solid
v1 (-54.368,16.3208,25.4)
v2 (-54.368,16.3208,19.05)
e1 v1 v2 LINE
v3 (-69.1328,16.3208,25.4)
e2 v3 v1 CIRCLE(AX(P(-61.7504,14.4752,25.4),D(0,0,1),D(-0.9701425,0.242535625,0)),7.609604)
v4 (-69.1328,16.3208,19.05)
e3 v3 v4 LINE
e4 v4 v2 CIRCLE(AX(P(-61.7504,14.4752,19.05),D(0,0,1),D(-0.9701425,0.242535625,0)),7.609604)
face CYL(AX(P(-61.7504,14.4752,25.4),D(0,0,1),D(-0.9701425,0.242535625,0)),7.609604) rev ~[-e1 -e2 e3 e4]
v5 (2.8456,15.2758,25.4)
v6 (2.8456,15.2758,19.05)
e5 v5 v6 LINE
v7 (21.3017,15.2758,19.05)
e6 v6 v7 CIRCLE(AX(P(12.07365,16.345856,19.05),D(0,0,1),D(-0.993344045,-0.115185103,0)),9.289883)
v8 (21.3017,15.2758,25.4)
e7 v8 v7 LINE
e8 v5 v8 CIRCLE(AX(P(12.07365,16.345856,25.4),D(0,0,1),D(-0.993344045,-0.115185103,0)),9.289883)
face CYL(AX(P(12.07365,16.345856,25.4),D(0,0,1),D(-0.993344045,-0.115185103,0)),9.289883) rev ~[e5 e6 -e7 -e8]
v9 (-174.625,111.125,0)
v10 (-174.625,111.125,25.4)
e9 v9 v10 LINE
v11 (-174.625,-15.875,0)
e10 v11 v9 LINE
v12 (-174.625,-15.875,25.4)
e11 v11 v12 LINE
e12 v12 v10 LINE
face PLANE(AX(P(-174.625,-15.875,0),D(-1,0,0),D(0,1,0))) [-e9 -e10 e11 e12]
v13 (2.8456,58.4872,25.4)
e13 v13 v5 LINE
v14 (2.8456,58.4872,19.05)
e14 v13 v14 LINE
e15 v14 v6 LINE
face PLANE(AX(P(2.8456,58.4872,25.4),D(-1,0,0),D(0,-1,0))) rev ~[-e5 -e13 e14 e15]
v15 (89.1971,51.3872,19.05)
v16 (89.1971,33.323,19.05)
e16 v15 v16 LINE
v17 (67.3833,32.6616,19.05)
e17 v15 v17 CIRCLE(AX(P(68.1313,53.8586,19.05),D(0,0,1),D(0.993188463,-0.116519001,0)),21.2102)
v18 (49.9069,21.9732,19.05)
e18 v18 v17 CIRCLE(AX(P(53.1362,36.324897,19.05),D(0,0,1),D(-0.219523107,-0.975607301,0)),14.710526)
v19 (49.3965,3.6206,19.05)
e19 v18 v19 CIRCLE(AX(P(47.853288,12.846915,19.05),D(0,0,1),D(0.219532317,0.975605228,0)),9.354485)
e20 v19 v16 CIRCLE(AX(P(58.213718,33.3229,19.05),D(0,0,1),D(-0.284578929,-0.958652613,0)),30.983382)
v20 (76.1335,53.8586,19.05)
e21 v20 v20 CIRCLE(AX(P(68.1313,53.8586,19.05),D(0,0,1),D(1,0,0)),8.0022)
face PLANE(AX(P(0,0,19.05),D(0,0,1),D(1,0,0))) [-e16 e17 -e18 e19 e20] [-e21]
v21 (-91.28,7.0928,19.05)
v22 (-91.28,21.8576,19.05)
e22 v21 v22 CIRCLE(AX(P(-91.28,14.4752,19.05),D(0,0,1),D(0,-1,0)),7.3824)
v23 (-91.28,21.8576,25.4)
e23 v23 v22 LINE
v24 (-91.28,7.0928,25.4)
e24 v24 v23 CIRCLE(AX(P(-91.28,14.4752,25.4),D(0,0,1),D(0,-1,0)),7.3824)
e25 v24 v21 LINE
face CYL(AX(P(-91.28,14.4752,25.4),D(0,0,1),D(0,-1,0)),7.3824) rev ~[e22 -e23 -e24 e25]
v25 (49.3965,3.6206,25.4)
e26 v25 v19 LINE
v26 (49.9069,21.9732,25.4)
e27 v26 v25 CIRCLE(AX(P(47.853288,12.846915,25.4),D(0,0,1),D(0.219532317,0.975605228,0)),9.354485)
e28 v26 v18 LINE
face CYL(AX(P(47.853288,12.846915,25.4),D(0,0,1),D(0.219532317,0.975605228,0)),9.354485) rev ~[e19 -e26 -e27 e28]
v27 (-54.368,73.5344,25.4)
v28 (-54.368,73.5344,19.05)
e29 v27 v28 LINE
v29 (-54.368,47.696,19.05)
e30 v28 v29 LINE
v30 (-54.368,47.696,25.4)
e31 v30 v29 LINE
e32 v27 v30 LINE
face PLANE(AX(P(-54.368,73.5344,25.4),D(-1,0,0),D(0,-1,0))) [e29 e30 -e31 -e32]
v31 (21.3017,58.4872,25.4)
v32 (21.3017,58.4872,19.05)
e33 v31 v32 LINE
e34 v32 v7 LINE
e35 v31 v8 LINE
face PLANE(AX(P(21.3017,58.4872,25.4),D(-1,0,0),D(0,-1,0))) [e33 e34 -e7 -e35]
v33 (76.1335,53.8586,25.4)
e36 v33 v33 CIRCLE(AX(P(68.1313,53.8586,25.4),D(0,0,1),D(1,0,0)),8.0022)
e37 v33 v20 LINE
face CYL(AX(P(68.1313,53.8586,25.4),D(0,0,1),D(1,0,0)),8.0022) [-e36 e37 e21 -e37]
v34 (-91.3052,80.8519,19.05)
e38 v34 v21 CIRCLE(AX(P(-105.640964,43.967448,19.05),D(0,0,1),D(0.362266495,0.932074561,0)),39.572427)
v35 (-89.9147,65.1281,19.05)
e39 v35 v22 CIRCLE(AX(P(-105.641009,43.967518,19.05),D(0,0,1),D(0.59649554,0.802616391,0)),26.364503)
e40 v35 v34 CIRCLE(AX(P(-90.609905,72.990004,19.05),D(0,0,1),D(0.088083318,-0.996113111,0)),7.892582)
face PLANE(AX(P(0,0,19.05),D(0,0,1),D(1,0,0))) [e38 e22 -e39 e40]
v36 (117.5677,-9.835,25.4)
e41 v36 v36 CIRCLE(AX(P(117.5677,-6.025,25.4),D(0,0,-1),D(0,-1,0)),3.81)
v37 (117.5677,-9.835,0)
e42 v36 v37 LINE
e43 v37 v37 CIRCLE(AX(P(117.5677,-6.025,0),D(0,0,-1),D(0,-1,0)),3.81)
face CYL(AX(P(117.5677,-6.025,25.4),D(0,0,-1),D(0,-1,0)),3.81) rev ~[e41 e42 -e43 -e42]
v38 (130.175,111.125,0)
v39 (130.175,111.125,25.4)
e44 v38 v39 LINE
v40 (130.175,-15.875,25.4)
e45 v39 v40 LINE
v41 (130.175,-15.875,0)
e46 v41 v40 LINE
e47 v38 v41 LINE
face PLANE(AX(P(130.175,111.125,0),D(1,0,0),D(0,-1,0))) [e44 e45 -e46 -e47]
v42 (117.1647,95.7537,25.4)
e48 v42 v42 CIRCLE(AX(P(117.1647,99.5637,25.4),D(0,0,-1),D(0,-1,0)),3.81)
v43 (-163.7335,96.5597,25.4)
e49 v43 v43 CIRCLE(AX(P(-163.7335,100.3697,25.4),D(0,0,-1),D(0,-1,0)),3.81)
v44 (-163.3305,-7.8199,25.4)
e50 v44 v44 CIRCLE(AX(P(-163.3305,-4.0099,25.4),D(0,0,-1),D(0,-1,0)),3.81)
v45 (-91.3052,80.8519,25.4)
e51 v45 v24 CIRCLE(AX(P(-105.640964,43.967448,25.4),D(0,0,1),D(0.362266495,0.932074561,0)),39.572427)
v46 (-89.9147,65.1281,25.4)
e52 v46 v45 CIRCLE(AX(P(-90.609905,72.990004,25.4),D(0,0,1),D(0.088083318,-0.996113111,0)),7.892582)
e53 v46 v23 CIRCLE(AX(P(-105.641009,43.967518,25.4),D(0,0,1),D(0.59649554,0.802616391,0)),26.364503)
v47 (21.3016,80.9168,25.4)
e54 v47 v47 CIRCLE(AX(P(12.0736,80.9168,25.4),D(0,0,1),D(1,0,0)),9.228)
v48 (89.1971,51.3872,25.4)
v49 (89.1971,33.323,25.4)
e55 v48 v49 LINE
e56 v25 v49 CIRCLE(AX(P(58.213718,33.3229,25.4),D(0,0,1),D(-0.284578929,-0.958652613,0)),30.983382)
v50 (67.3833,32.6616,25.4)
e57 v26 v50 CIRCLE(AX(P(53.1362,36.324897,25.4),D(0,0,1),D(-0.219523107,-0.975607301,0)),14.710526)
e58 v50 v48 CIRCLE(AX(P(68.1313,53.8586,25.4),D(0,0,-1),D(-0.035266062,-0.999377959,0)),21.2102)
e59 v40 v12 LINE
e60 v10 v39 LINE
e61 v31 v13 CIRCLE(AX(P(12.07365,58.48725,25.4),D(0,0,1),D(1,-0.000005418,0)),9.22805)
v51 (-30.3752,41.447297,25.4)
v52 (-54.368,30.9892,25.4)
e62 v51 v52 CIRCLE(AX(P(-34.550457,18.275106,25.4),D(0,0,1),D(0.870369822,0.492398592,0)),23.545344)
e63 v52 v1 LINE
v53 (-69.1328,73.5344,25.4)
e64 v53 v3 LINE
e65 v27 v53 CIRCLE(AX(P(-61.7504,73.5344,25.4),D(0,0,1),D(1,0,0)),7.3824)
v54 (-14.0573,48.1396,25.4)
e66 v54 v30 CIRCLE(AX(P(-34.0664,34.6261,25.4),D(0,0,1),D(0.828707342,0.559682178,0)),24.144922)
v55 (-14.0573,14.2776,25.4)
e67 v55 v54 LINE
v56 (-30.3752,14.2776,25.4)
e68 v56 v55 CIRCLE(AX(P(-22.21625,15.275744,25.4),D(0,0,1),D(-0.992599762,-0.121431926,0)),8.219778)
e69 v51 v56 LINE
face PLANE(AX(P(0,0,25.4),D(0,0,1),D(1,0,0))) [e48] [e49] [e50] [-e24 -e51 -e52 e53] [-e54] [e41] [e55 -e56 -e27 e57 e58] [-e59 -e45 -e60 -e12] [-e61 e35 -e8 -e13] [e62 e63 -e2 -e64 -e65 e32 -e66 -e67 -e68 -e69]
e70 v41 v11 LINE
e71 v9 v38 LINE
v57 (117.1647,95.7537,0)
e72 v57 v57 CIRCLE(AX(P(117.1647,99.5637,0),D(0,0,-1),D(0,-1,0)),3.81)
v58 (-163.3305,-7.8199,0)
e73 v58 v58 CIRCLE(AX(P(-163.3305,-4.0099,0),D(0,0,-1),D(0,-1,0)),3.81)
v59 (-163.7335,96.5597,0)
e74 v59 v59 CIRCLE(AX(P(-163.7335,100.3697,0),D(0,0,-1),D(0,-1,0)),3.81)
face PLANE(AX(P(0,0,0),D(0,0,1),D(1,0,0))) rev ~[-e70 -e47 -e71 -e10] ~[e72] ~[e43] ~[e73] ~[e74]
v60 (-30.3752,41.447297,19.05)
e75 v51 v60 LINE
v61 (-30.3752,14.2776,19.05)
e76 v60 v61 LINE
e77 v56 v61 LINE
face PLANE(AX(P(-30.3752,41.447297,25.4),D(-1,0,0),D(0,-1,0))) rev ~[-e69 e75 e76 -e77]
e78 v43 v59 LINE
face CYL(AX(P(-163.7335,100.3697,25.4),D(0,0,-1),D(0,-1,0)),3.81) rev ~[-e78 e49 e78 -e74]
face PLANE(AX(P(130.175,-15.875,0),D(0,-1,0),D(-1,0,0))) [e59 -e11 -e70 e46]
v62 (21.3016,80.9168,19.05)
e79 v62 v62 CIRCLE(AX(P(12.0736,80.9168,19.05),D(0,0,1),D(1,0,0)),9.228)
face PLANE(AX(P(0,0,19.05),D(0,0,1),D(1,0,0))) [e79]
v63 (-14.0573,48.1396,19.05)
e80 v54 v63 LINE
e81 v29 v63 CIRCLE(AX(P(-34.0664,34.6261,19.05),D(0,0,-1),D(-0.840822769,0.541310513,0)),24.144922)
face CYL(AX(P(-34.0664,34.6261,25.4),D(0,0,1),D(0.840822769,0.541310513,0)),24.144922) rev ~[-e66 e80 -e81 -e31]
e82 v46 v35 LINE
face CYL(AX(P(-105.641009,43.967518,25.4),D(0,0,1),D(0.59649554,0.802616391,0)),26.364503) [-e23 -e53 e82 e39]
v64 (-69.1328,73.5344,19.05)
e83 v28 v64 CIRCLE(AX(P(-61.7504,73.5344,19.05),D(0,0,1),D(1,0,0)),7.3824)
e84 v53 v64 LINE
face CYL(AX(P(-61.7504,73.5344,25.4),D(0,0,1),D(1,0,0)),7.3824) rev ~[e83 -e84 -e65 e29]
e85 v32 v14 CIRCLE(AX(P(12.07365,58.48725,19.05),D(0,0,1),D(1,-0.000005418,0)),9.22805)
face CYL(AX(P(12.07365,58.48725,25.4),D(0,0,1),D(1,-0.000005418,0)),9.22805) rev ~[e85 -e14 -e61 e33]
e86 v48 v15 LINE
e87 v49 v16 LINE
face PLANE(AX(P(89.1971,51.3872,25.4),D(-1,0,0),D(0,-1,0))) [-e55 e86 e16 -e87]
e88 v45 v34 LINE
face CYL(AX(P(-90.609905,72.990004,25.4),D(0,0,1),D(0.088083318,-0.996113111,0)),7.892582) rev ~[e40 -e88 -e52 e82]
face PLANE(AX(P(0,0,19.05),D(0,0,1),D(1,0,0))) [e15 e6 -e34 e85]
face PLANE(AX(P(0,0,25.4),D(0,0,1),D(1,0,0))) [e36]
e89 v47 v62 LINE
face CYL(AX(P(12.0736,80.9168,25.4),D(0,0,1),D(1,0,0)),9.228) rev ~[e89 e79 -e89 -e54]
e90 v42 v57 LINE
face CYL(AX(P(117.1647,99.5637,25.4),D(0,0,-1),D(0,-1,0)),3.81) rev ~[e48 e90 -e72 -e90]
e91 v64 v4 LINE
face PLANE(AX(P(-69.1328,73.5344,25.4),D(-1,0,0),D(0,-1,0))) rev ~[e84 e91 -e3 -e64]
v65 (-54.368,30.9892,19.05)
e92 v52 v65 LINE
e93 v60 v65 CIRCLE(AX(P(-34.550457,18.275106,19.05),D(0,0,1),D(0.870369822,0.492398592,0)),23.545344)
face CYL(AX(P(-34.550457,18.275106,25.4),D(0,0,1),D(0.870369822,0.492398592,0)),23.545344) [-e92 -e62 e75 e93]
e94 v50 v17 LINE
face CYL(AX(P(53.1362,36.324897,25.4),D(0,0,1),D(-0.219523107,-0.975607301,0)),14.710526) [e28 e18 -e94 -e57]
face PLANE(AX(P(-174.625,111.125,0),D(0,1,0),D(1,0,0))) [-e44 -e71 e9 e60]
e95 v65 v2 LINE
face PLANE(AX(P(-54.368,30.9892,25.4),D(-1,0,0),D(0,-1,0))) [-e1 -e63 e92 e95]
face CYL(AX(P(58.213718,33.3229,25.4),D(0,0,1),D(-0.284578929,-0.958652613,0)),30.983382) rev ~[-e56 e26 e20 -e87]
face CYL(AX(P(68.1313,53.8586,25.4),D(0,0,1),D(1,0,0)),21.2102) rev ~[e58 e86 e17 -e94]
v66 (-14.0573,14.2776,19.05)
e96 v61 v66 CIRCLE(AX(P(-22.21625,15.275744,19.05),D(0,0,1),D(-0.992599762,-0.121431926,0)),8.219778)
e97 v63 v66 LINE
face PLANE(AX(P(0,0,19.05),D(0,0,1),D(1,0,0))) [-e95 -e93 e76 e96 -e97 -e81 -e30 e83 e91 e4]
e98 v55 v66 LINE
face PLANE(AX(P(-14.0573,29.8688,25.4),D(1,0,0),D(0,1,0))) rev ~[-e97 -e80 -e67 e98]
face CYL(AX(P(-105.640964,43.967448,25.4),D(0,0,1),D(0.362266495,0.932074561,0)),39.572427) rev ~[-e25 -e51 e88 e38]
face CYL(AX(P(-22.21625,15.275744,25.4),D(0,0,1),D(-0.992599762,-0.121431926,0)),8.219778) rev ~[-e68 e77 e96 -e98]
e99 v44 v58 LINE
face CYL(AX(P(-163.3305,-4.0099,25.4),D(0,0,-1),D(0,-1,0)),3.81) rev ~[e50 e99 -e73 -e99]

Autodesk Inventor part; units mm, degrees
ref_plane "YZ Plane" through (0, 0, 0) normal (1, 0, 0) x (0, 1, 0)
ref_plane "XZ Plane" through (0, 0, 0) normal (0, 1, 0) x (-1, 0, 0)
ref_plane "XY Plane" through (0, 0, 0) normal (0, 0, 1) x (1, 0, 0)
sketch "Sketch1" plane through (0, 0, 0) normal (0, 0, 1) x (1, 0, 0)
  line L0 (-174.625, 111.125) -> (130.175, 111.125)
  line L1 (130.175, 111.125) -> (130.175, -15.875)
  line L2 (130.175, -15.875) -> (-174.625, -15.875)
  line L3 (-174.625, -15.875) -> (-174.625, 111.125)
  point P0 (0, 0)
  dimension "d0" = 127
  dimension "d1" = 304.8
extrude "Extrusion1" add sketch "Sketch1" along normal blind 25.4
sketch "Sketch2" plane through (0, 0, 25.4) normal (0, 0, 1) x (1, 0, 0)
  arc A0 (-89.9147, 65.1281) -> (-91.28, 21.8576) centre (-105.641, 43.9675) ccw
  arc A1 (-91.3052, 80.8519) -> (-91.28, 7.0928) centre (-105.641, 43.9675) ccw
  arc A2 (-91.28, 7.0928) -> (-91.28, 21.8576) centre (-91.28, 14.4752) ccw
  arc A3 (-89.9147, 65.1281) -> (-91.3052, 80.8519) centre (-90.6099, 72.99) ccw
  line L0 (-69.1328, 16.3208) -> (-69.1328, 73.5344)
  line L1 (-54.368, 16.3208) -> (-54.368, 73.5344)
  arc A4 (-69.1328, 16.3208) -> (-54.368, 16.3208) centre (-61.7504, 14.4752) ccw
  arc A5 (-54.368, 73.5344) -> (-69.1328, 73.5344) centre (-61.7504, 73.5344) ccw
  arc A6 (-14.0573, 29.8688) -> (-54.368, 30.9892) centre (-34.5504, 18.2752) ccw
  arc A7 (-13.7648, 47.696) -> (-54.368, 47.696) centre (-34.0664, 34.6261) ccw
  line L2 (-14.0573, 29.8688) -> (-14.0573, 14.2776)
  line L3 (-14.0573, 48.1396) -> (-14.0573, 29.8688)
  line L4 (-30.3752, 14.2776) -> (-30.3752, 58.4872)
  arc A8 (-30.3752, 14.2776) -> (-14.0573, 14.2776) centre (-22.2162, 15.2758) ccw
  line L5 (2.8456, 15.2758) -> (2.8456, 58.4872)
  line L6 (21.3017, 15.2758) -> (21.3017, 58.4872)
  arc A9 (2.8456, 15.2758) -> (21.3017, 15.2758) centre (12.0736, 16.3458) ccw
  arc A10 (21.3017, 58.4872) -> (2.8456, 58.4872) centre (12.0736, 58.4872) ccw
  circle A11 centre (12.0736, 80.9168) radius 9.228
  circle A12 centre (68.1313, 53.8586) radius 21.2102
  circle A13 centre (68.1313, 53.8586) radius 8.0022
  arc A14 (49.3965, 3.6206) -> (89.1971, 33.323) centre (58.2137, 33.323) ccw
  line L7 (89.1971, 33.323) -> (89.1971, 51.3872)
  arc A15 (49.9069, 21.9732) -> (67.3833, 32.6616) centre (53.1362, 36.3249) ccw
  arc A16 (49.9069, 21.9732) -> (49.3965, 3.6206) centre (47.8533, 12.8469) ccw
  point P0 (0, 0)
  dimension "d42" = 13.208
  dimension "d43" = 13.208
emboss "Emboss1" sketch "Sketch2" operation cut depth 6.35 direction (0, 0, -1)
hole "Hole1" at (-163.3305, -4.0099, 25.4) direction (0, 0, -1) diameter 7.62 end through all
hole "Hole2" at (-163.7335, 100.3697, 25.4) direction (0, 0, -1) diameter 7.62 end through all
hole "Hole3" at (117.1647, 99.5637, 25.4) direction (0, 0, -1) diameter 7.62 end through all
hole "Hole4" at (117.5677, -6.025, 25.4) direction (0, 0, -1) diameter 7.62 end through all
properties part number "NewNameChirag"
